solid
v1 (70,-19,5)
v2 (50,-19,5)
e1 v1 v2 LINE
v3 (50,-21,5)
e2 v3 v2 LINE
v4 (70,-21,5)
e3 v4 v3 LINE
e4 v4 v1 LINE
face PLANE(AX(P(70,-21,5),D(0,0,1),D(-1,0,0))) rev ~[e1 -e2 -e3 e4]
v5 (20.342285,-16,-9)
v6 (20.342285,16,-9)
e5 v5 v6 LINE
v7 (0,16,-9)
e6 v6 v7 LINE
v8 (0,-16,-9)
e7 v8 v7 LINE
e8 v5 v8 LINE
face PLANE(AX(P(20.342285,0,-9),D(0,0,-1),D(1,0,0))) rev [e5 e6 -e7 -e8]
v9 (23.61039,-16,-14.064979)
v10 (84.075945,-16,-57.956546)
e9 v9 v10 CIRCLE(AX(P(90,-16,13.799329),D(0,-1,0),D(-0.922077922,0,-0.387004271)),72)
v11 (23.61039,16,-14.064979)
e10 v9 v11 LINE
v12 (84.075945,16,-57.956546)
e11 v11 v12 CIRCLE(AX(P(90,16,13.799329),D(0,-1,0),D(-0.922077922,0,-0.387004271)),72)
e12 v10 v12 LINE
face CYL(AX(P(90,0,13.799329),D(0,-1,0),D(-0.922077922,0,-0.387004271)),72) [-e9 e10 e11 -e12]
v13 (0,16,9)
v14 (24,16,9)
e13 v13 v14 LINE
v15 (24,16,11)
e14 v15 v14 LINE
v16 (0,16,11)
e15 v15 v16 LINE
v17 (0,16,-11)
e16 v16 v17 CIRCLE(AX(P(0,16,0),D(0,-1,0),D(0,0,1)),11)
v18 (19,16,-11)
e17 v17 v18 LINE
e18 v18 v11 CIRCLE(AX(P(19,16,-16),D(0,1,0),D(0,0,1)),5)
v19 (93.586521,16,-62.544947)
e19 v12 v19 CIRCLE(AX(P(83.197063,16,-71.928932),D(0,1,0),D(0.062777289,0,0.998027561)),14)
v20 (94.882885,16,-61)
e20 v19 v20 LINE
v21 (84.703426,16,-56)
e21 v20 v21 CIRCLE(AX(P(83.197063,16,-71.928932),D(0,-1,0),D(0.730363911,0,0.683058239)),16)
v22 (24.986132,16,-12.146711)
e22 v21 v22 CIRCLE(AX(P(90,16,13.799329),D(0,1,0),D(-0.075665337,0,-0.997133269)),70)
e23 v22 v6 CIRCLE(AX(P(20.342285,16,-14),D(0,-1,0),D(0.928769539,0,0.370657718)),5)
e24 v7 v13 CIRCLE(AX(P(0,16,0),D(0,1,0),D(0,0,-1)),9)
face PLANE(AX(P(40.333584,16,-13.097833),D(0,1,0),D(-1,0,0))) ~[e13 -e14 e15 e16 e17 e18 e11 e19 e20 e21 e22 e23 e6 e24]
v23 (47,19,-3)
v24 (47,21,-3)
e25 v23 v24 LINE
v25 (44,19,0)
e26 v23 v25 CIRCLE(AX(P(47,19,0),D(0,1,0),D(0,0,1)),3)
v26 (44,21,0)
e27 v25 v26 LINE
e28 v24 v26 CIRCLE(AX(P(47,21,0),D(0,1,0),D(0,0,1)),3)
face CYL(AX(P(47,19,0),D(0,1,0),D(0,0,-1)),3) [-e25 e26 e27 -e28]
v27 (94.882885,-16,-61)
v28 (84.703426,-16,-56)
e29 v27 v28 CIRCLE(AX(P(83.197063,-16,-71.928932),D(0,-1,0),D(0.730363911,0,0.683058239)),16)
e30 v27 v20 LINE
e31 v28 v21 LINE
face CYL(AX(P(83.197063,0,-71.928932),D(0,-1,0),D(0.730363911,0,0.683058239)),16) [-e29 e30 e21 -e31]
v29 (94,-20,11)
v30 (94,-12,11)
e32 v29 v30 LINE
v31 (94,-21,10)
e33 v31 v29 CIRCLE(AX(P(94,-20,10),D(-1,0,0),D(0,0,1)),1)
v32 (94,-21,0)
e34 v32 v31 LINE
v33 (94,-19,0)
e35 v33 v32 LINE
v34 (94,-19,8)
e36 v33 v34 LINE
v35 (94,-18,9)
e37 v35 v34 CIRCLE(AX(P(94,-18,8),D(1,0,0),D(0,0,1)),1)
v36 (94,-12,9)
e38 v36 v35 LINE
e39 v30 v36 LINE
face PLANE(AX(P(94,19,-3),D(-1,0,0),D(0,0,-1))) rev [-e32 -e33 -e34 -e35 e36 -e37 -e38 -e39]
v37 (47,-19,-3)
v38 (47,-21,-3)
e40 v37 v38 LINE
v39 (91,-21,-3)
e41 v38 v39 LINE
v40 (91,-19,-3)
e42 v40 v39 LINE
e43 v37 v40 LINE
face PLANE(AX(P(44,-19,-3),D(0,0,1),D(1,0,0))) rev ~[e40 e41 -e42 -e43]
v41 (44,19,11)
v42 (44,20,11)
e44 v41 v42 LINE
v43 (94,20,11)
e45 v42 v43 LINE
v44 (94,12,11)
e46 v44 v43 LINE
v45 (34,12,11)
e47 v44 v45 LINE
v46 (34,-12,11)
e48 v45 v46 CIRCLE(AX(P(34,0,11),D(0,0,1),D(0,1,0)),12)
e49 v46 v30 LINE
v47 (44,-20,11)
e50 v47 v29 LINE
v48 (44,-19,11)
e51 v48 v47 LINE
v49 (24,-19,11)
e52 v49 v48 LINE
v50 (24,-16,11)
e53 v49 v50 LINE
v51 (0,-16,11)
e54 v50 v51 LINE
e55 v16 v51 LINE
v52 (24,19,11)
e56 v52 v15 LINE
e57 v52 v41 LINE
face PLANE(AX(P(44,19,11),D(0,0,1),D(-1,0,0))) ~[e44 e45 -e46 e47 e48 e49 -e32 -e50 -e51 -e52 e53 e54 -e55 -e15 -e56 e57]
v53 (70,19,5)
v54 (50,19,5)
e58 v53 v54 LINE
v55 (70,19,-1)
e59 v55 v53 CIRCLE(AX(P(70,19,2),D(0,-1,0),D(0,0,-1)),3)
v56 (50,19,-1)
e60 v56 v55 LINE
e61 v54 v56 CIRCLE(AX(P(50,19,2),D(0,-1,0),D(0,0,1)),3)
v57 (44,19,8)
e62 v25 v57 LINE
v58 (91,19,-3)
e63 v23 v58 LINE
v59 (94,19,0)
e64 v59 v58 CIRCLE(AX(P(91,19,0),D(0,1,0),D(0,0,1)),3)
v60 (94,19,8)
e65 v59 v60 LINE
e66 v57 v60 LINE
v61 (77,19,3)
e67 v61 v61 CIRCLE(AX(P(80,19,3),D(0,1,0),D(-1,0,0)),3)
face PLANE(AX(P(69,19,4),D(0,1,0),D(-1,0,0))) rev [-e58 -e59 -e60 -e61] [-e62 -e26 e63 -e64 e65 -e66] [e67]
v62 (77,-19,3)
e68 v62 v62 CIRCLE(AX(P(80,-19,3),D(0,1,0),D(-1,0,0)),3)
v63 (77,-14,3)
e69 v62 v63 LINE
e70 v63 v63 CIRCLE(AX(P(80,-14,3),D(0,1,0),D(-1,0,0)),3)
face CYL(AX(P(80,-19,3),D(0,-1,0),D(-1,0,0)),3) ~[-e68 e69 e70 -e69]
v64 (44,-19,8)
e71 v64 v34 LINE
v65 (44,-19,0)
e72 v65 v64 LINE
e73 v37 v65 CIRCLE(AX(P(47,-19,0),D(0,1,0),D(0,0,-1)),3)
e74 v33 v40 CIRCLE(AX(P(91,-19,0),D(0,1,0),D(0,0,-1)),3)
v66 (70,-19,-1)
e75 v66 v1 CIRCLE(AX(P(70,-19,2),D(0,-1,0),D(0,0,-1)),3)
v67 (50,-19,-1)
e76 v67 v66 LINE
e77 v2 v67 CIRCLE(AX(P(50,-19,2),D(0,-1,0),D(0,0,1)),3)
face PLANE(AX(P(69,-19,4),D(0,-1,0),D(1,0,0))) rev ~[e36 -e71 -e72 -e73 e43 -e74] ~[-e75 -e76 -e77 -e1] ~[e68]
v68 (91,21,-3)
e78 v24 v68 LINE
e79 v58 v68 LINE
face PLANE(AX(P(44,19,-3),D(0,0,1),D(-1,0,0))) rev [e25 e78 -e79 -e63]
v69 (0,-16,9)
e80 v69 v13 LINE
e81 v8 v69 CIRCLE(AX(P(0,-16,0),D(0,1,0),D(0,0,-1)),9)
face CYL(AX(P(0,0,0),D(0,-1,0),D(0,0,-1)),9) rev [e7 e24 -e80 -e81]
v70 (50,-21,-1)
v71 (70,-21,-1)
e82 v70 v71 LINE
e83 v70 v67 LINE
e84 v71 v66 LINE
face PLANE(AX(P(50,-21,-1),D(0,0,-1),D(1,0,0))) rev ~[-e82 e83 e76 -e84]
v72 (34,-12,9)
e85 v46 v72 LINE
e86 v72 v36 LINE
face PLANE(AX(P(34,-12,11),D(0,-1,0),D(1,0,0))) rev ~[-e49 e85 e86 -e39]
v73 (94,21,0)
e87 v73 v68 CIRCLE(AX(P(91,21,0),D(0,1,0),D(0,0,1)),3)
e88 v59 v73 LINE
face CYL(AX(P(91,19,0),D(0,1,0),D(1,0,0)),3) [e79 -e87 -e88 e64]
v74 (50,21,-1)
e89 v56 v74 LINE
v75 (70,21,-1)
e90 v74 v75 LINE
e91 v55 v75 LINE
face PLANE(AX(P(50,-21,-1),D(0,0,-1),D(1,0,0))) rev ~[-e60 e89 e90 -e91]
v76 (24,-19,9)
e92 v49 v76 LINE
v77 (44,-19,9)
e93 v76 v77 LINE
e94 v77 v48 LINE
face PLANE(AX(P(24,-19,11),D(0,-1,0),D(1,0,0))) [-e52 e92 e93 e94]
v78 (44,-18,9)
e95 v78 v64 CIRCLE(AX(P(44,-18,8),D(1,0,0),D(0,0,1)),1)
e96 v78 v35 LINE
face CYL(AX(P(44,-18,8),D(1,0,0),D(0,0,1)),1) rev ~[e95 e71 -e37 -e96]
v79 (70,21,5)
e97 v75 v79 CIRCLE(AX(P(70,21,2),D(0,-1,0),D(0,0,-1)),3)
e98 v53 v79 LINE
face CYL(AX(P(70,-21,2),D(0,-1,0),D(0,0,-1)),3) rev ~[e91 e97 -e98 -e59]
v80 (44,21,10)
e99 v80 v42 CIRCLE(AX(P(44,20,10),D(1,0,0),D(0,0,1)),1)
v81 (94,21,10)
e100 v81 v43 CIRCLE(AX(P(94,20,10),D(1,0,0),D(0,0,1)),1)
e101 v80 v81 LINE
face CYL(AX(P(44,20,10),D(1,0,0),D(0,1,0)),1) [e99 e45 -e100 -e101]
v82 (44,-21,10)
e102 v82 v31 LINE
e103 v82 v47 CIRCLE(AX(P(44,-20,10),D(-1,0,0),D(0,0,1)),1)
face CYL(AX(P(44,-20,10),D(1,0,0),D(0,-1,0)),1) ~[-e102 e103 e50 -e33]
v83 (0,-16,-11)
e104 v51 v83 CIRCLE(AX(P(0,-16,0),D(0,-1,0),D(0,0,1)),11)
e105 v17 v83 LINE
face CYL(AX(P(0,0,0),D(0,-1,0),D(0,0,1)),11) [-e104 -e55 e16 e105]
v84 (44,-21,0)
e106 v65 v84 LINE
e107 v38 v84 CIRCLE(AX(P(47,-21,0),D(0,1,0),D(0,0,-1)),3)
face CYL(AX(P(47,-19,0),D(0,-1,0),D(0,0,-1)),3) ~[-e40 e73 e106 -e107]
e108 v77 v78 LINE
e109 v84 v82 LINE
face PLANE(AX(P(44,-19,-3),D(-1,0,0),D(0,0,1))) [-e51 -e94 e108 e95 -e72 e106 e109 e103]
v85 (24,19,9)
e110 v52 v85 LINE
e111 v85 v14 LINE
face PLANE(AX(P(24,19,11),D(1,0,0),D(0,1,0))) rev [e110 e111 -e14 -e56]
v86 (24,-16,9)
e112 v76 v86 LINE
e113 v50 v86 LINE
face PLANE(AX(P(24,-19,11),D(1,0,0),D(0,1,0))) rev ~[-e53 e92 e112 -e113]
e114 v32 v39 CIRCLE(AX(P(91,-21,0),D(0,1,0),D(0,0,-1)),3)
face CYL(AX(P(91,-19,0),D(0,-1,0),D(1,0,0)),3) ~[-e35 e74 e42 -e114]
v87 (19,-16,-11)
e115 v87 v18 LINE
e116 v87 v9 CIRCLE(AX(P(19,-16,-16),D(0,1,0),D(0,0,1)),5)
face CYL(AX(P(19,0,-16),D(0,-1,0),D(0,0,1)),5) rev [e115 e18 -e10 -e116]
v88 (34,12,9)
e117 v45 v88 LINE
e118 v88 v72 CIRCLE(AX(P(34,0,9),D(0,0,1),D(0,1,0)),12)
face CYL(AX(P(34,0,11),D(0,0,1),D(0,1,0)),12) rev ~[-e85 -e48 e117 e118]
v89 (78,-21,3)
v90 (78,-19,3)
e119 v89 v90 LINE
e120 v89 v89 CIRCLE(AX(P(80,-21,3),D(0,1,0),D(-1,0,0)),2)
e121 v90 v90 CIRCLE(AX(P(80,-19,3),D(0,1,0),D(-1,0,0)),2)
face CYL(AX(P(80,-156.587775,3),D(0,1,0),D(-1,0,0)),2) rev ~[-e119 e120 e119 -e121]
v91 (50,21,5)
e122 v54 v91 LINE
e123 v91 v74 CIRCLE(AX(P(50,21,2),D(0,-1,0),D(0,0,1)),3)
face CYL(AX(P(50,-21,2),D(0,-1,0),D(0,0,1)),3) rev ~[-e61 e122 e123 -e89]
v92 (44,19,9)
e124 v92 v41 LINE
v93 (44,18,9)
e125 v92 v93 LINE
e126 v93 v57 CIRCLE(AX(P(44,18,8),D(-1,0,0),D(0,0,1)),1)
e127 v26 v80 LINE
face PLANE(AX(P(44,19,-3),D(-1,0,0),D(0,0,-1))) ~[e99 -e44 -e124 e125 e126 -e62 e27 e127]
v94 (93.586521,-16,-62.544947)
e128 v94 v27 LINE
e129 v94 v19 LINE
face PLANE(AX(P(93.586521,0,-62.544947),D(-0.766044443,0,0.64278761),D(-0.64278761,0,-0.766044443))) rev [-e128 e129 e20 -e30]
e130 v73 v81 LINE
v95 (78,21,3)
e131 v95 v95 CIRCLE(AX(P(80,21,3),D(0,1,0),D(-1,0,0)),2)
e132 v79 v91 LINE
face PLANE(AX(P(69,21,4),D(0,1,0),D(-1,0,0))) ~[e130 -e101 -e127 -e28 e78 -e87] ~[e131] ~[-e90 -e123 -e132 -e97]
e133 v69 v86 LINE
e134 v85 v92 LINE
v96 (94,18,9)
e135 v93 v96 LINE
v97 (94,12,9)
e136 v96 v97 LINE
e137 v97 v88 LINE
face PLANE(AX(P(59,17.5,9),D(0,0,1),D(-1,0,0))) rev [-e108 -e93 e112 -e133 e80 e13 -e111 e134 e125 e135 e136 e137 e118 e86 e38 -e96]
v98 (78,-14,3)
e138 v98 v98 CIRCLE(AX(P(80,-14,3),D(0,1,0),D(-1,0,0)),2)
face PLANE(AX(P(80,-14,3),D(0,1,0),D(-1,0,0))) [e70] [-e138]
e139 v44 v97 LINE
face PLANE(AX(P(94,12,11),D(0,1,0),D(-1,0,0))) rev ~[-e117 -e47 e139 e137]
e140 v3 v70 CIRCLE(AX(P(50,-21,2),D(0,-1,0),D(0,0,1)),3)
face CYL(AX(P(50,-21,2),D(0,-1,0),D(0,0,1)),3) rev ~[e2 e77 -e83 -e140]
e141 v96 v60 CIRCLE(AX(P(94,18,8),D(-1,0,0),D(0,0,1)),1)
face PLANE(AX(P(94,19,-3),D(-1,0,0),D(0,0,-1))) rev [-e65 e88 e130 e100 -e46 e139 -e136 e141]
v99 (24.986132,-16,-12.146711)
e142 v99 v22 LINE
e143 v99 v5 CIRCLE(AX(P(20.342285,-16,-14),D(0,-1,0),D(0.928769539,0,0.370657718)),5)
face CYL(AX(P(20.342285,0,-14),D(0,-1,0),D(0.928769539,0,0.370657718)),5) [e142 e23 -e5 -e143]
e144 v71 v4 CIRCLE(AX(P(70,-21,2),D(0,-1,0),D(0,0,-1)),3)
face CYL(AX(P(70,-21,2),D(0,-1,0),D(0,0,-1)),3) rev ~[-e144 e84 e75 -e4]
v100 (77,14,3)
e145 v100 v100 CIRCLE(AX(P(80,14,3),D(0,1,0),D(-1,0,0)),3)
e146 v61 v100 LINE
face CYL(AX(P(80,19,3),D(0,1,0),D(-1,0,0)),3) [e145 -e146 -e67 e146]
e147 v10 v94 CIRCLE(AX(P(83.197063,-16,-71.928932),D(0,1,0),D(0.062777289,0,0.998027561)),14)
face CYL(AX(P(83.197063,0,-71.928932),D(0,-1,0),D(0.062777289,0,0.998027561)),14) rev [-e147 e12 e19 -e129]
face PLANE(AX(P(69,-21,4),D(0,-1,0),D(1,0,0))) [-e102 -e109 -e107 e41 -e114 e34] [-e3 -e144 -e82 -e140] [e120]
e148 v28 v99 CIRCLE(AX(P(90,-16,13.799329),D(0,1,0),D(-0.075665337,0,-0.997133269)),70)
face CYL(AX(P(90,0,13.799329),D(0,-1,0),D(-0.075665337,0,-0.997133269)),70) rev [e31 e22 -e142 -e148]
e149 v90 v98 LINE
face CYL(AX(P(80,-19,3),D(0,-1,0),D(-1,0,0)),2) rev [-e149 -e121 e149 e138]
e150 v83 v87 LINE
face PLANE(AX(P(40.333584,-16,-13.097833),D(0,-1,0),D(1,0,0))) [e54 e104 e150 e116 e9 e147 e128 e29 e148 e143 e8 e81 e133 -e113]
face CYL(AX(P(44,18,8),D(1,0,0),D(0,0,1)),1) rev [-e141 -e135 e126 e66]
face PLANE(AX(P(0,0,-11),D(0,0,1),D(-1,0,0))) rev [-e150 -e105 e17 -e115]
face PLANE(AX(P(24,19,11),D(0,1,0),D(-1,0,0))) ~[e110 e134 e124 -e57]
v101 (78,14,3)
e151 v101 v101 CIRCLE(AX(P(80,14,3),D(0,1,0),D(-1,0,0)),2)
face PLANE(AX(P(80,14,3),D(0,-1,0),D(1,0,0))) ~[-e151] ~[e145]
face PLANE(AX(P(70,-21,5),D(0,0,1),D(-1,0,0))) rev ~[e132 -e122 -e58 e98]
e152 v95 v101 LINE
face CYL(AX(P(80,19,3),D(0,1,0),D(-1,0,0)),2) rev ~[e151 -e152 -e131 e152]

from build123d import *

# Parameters (mm, degrees)
F1_DEPTH  = 16
F2_W      = 70
F2_H      = 3
F3_DEPTH  = 2
F4_W      = 50
F4_H      = 14
F5_DEPTH  = 2
F6_R      = 1
F9_DEPTH  = 2
F11_DEPTH = 42.001
F13_D     = 4
F14_R     = 3
F14_R_2   = 2
F15_DEPTH = 5
F16_R     = 3


# Not quite as in the source:
# - a pattern or mirror of a feature is missing from the dataset's text; its kind, count and spacing are read off the source's solid


with BuildPart() as f1:
    # F0 (on Front) → F1 (new body)
    with BuildSketch(Plane.XZ):
        with BuildLine():
            ThreePointArc((0, -9), (-9, 0), (0, 9))
            Line((0, 9), (94, 9))
            Line((94, 9), (94, 11))
            Line((94, 11), (0, 11))
            ThreePointArc((0, 11), (-11, 0), (0, -11))
            Line((0, -11), (19, -11))
            ThreePointArc((19, -11), (21.7681124643, -11.8361612201), (23.6103896104, -14.064978646))
            ThreePointArc((23.6103896104, -14.064978646), (47.704208574, -44.4678662727), (84.0759449666, -57.9565459739))
            ThreePointArc((84.0759449666, -57.9565459739), (89.2804195373, -59.3196982134), (93.5865207758, -62.5449473062))
            Line((93.5865207758, -62.5449473062), (94.8828854905, -61))
            ThreePointArc((94.8828854905, -61), (90.2510294077, -57.5678191663), (84.7034264019, -56))
            ThreePointArc((84.7034264019, -56), (48.5673164119, -42.6217020739), (24.9861322889, -12.1467114099))
            ThreePointArc((24.9861322889, -12.1467114099), (23.1470623984, -9.8607704249), (20.3422845953, -9))
            Line((20.3422845953, -9), (0, -9))
        make_face()
    extrude(amount=F1_DEPTH)

    # F2 (on face) → F3 (join)
    with BuildSketch(Plane.XY.offset(11)):
        with Locations((59, -17.5)):
            Rectangle(F2_W, F2_H)
    extrude(amount=-F3_DEPTH)

    # F4 (on face) → F5 (join)
    with BuildSketch(Plane.XZ.offset(19)):
        with Locations((69, 4)):
            Rectangle(F4_W, F4_H)
    extrude(amount=F5_DEPTH)

    # F6
    f6_edges = [f1.edges().sort_by_distance(p)[0] for p in [
        (69, -21, 11),
        (69, -19, 9),
    ]]
    fillet(f6_edges, radius=F6_R)

    # F7: F1 across plane


with BuildPart() as f1_1:
    add(f1.part)
    add(f1.part.mirror(Plane.XZ))

    # F8 (on face) → F9 (cut)
    with BuildSketch(Plane.XY.offset(11)):
        with BuildLine():
            Line((94, 12), (34, 12))
            ThreePointArc((34, 12), (22, 0), (34, -12))
            Line((34, -12), (94, -12))
            Line((94, -12), (94, 12))
        make_face()
    extrude(amount=-F9_DEPTH, mode=Mode.SUBTRACT)

    # F10 (on face) → F11 (cut, through all)
    with BuildSketch(Plane.XZ.offset(21)):
        with BuildLine():
            ThreePointArc((50, 5), (47, 2), (50, -1))
            Line((50, -1), (70, -1))
            ThreePointArc((70, -1), (73, 2), (70, 5))
            Line((70, 5), (50, 5))
        make_face()
    extrude(amount=-F11_DEPTH, mode=Mode.SUBTRACT)

    # F13 (through all)
    with Locations(Plane.XZ.offset(21)):
        with Locations((80, 3)):
            Hole(F13_D / 2)

    # F14 (on face) → F15 (join)
    with BuildSketch(Plane(origin=(0, -19, 0), x_dir=(-1, 0, 0), z_dir=(0, 1, 0))):
        with Locations((-80, 3)):
            Circle(F14_R)
        with Locations((-80, 3)):
            Circle(F14_R_2, mode=Mode.SUBTRACT)
    f15 = extrude(amount=F15_DEPTH)

    # F15_copies: F15 across plane
    add(f15.mirror(Plane.ZX))

    # F16
    f16_edges = [f1_1.edges().sort_by_distance(p)[0] for p in [
        (94, 20, -3),
        (44, 20, -3),
        (44, -20, -3),
        (94, -20, -3),
    ]]
    fillet(f16_edges, radius=F16_R)


solid = f1_1.part
